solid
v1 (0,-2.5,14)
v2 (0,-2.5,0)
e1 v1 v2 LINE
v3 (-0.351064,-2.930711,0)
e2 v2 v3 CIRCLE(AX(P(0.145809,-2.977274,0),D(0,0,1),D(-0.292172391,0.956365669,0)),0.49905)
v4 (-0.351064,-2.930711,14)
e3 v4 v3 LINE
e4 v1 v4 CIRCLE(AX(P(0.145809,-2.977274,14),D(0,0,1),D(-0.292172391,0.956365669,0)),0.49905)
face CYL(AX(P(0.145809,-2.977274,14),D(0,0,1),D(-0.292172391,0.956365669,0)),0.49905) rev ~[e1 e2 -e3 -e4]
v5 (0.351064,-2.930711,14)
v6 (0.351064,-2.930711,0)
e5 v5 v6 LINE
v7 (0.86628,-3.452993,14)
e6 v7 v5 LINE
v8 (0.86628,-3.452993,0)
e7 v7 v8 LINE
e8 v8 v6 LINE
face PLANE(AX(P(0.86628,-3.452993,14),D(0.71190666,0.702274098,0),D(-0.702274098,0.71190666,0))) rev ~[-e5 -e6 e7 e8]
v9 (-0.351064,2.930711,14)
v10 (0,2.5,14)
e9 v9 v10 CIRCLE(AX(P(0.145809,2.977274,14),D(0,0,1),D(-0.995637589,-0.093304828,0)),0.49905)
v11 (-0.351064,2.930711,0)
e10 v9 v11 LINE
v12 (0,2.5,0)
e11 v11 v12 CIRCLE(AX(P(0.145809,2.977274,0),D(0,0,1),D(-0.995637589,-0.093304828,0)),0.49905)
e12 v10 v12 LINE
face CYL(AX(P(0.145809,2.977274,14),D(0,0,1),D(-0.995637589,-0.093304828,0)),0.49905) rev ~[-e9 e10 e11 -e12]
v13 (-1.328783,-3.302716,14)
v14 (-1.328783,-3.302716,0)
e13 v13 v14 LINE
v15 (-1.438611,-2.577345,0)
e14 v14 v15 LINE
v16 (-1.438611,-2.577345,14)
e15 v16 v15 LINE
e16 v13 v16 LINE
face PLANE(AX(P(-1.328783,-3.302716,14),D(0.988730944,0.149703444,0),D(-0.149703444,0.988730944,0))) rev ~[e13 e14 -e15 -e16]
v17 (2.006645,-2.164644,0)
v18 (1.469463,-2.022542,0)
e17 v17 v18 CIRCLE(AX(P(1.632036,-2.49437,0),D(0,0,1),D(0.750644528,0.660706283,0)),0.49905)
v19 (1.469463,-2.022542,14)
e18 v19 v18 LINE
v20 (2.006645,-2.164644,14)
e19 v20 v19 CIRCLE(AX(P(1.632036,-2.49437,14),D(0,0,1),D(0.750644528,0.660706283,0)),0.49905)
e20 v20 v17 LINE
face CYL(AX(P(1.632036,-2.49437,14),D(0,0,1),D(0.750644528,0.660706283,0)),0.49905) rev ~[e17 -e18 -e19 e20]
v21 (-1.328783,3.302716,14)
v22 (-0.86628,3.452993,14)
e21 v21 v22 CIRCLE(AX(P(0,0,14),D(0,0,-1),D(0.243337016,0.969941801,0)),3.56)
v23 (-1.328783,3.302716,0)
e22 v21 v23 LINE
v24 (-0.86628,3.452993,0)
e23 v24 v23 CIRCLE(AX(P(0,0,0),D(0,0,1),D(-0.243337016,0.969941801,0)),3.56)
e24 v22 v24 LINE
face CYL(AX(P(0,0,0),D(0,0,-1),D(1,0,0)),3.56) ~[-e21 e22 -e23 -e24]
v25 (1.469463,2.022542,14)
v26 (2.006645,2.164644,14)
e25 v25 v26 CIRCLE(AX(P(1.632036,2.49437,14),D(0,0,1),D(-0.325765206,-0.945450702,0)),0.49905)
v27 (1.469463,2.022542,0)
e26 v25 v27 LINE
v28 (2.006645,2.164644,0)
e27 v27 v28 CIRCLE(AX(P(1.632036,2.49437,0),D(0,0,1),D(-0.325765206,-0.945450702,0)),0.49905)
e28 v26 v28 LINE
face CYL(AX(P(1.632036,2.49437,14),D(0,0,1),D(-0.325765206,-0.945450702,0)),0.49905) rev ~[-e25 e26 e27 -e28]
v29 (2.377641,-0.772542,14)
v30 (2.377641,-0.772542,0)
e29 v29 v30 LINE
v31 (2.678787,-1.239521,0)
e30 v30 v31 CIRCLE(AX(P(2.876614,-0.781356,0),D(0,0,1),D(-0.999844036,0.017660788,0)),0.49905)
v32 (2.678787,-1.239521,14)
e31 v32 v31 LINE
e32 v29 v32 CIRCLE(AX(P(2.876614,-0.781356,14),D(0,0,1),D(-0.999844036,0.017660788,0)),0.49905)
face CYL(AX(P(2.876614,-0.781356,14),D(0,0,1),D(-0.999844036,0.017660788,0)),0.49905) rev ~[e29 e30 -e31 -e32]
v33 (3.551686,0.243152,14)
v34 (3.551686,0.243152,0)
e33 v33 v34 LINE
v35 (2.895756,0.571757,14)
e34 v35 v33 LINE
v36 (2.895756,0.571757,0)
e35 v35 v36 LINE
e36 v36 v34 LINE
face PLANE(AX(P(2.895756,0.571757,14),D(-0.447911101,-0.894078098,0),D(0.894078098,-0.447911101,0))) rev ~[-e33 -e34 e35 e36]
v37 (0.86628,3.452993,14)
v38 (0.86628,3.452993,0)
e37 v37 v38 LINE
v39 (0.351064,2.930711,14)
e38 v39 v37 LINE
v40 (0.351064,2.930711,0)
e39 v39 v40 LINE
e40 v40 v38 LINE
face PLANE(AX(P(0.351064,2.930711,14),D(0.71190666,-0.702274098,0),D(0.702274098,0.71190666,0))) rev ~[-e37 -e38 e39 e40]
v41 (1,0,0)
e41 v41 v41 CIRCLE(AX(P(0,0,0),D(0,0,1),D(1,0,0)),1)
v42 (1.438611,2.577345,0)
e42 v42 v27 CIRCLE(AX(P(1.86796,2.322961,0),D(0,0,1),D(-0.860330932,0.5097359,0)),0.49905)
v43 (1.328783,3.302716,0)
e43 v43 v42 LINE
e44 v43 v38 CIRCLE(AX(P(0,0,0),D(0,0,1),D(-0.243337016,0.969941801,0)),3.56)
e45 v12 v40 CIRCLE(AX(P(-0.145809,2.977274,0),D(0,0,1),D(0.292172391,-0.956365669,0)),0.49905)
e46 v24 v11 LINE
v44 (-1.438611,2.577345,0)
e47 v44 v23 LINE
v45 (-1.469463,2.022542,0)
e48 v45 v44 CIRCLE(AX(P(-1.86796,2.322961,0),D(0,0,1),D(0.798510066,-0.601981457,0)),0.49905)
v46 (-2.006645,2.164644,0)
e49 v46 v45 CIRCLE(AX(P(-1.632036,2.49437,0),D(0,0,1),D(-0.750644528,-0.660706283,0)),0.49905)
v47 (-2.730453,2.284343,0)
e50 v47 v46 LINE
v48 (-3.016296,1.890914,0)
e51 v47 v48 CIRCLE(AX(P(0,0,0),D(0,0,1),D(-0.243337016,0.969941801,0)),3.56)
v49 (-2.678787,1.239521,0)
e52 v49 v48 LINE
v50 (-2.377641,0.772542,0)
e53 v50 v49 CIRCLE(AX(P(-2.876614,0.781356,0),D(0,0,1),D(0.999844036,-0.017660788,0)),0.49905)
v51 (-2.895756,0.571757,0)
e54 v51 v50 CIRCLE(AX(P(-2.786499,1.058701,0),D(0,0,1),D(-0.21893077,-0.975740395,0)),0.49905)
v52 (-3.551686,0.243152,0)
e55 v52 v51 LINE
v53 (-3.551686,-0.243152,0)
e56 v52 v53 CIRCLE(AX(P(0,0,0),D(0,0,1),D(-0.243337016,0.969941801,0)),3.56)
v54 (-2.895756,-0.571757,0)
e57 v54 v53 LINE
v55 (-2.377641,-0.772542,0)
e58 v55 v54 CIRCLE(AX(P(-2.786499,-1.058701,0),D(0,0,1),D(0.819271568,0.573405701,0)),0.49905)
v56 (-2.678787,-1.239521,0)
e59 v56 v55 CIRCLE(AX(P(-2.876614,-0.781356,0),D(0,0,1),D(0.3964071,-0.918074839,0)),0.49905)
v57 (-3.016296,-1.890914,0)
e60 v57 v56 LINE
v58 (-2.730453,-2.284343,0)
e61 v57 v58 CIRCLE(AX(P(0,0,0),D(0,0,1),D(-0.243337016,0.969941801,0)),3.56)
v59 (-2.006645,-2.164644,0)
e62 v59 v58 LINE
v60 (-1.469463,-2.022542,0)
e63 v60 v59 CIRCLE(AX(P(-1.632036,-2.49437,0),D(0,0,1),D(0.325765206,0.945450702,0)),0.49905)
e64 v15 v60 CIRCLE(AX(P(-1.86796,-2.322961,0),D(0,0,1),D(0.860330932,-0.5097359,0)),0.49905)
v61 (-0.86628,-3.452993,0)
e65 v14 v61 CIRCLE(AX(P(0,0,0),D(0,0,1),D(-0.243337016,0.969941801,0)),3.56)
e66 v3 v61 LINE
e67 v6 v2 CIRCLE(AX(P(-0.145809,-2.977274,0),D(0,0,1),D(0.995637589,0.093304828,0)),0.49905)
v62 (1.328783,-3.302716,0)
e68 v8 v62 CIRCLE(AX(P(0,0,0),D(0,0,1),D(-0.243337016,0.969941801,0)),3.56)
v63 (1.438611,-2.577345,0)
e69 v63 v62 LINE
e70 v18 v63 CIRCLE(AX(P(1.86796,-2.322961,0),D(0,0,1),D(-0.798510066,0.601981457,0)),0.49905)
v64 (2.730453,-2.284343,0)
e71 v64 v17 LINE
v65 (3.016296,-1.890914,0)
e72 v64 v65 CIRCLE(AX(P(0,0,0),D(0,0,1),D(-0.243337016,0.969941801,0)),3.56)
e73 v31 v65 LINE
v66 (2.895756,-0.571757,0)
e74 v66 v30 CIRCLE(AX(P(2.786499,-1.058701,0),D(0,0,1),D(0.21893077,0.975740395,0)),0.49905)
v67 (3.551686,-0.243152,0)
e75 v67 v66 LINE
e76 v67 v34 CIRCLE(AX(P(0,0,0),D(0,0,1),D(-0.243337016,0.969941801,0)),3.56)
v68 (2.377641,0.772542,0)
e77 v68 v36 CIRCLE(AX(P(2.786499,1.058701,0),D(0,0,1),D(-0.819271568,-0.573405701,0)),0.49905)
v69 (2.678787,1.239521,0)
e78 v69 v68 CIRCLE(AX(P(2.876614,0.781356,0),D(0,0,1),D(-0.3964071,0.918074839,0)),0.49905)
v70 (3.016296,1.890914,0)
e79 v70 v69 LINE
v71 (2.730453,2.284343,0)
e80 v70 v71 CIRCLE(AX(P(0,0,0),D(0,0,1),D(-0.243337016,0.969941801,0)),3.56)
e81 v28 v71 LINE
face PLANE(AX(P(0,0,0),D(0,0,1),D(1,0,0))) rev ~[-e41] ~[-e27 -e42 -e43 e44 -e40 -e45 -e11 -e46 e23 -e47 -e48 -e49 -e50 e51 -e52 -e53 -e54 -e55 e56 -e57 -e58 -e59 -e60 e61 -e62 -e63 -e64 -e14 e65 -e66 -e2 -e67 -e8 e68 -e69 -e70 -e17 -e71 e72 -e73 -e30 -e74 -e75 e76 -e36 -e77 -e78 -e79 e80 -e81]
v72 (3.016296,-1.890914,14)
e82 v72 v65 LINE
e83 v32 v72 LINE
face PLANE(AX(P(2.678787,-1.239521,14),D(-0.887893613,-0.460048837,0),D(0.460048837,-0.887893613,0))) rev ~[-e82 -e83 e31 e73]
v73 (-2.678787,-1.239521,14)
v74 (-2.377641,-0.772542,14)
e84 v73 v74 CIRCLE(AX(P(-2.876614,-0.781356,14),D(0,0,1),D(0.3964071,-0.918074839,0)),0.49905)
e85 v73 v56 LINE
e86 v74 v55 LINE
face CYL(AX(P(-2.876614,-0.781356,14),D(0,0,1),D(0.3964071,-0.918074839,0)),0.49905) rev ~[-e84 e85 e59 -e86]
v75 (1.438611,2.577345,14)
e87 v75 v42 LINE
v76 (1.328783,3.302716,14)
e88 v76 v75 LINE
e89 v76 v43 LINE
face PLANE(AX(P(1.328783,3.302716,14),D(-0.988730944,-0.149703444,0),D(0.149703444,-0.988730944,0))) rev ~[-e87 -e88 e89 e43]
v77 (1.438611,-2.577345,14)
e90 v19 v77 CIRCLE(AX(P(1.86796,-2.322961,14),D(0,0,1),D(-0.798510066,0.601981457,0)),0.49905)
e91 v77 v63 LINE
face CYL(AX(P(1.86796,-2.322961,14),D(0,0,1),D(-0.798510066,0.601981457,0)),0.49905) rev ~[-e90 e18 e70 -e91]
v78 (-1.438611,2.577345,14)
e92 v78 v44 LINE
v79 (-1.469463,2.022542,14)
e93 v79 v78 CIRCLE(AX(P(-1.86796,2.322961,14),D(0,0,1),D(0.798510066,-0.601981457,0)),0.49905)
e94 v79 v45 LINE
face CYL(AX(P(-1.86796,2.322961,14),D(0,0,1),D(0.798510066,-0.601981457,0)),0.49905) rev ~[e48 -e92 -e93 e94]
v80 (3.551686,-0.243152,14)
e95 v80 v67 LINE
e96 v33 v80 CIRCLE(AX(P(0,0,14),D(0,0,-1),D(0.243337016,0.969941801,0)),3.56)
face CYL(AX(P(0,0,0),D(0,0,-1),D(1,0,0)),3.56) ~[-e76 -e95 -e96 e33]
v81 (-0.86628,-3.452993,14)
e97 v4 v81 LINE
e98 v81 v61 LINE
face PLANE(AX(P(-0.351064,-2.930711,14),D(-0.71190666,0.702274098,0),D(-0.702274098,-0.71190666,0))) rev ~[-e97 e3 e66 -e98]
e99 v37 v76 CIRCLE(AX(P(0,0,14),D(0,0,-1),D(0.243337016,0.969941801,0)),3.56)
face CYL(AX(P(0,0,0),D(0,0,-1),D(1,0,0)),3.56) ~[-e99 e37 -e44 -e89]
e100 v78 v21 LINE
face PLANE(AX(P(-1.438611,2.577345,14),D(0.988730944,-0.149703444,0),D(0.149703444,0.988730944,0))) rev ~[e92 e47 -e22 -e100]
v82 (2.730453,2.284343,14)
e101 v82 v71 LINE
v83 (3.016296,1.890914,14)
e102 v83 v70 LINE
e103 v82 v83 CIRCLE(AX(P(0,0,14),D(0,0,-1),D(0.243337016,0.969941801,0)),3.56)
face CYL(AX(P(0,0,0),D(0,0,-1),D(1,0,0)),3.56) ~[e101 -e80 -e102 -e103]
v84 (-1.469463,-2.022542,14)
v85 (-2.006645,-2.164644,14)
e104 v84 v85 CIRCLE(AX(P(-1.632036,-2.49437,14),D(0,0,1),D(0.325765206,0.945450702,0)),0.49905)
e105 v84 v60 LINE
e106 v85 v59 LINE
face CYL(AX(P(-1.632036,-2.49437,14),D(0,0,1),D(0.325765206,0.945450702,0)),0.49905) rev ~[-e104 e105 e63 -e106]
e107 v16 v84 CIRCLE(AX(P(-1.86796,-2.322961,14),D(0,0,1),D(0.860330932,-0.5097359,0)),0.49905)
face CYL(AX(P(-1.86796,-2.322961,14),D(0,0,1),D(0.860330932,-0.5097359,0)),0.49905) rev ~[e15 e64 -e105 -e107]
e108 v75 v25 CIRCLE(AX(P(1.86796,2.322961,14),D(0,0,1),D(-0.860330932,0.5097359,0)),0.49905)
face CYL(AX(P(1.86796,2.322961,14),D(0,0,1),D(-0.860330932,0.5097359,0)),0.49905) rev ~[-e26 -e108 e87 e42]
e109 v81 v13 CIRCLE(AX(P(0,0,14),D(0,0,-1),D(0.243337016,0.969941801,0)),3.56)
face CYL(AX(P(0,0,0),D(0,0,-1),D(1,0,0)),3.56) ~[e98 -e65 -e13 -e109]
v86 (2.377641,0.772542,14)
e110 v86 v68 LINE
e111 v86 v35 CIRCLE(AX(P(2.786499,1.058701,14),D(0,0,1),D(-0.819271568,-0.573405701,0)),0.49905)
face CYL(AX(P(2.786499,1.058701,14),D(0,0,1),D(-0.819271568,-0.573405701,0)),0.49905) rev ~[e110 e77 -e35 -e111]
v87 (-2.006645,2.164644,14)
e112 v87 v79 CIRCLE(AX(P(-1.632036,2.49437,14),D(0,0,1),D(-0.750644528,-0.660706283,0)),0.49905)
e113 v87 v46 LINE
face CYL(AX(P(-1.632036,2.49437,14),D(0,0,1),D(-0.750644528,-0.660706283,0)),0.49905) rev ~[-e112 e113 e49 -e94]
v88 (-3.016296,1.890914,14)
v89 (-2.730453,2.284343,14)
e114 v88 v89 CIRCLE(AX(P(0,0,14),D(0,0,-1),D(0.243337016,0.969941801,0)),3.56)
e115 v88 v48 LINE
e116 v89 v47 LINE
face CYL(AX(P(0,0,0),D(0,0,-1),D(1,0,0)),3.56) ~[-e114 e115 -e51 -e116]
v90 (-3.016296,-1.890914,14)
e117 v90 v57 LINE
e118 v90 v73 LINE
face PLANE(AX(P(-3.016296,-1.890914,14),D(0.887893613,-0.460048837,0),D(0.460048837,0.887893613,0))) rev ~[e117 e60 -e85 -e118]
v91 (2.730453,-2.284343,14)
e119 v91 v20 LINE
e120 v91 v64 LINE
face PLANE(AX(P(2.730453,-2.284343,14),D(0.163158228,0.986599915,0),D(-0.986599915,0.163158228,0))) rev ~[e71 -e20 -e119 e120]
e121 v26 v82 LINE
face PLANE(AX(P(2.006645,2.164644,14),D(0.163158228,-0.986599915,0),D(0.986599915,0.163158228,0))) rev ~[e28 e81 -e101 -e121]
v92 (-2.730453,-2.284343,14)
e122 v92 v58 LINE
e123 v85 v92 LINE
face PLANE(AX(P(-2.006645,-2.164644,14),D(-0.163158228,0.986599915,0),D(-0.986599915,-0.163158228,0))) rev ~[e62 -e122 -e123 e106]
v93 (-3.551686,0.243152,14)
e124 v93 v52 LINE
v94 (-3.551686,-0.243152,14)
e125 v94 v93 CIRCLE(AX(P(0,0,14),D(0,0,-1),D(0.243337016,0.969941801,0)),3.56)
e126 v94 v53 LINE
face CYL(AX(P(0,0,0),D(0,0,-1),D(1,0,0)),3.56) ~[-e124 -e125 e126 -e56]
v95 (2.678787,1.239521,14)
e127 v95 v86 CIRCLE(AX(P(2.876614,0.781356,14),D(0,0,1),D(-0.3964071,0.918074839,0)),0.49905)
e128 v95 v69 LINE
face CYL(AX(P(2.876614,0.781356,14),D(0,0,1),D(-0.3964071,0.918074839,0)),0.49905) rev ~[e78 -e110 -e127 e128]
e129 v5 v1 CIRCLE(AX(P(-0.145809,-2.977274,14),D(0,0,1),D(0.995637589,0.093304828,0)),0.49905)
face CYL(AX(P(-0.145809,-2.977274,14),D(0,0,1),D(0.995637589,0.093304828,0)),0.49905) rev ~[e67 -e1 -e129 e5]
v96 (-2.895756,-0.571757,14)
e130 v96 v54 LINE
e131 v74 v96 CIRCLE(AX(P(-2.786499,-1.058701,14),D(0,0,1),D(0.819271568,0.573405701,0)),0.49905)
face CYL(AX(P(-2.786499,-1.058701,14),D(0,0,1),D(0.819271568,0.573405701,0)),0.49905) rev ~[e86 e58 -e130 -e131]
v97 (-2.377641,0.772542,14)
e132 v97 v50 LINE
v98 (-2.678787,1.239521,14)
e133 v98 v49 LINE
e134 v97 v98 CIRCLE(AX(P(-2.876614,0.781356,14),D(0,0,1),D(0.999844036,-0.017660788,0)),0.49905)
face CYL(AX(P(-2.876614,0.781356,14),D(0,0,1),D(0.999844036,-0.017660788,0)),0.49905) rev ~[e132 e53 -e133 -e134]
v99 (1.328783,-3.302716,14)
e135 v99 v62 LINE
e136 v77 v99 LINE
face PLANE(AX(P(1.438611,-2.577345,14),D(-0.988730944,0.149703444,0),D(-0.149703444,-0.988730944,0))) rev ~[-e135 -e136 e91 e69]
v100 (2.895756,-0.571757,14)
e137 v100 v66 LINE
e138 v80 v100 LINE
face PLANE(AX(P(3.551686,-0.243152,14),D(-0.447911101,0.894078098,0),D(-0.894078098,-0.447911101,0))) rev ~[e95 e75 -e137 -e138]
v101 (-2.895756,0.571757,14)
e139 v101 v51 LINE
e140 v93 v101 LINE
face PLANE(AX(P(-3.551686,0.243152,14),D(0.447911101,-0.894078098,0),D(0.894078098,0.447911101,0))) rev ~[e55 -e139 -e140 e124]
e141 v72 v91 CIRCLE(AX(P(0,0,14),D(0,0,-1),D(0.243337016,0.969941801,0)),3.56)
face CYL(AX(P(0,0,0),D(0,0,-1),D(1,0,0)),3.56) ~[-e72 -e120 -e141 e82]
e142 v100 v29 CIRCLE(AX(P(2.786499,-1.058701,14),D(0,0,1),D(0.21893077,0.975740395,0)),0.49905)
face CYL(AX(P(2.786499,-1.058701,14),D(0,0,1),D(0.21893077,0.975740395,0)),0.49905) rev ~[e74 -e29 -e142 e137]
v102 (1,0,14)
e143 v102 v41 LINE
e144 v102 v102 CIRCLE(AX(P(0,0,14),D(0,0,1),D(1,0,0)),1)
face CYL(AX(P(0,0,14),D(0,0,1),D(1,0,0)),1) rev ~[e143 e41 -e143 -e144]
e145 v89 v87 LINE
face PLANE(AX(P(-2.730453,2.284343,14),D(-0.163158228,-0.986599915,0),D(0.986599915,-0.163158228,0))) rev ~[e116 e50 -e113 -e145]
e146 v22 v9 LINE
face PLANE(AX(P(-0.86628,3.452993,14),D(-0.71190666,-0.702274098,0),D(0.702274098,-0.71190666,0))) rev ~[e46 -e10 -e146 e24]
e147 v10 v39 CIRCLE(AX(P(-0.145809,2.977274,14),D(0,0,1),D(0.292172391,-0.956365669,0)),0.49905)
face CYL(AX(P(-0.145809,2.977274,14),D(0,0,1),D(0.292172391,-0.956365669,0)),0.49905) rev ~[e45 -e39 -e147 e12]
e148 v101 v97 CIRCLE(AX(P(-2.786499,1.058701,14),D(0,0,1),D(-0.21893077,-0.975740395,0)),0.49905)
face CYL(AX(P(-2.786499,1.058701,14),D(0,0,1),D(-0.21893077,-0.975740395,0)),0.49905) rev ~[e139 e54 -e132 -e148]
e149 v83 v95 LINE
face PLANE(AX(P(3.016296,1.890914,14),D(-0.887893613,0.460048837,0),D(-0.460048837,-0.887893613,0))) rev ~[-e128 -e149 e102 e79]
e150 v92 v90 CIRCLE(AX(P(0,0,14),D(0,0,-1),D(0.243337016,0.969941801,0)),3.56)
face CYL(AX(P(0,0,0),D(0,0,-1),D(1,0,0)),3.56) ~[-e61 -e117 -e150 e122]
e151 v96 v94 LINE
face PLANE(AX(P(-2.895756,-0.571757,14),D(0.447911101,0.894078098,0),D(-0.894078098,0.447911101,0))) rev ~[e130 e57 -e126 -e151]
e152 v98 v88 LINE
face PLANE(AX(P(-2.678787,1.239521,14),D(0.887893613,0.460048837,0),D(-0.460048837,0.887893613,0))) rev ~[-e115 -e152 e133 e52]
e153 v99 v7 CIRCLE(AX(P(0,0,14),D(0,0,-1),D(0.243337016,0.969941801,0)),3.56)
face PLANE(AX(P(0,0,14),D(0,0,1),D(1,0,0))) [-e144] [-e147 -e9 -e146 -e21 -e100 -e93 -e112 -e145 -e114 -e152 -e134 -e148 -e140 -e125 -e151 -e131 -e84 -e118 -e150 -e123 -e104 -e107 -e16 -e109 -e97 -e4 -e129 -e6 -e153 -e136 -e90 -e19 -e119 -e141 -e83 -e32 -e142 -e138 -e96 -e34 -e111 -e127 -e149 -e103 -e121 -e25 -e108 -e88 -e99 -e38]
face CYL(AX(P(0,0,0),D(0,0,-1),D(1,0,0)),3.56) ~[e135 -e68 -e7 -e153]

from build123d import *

# Parameters (mm, degrees)
F0_R     = 3.56
F1_DEPTH = 14
F2_R     = 1
F3_DEPTH = 20.5
F5_DEPTH = 14
F6_COUNT = 10


with BuildPart() as f1:
    # F0 (on Top) → F1 (new body)
    with BuildSketch(Plane.XY):
        Circle(F0_R)
    extrude(amount=F1_DEPTH)

    # F2 (on face) → F3 (cut)
    with BuildSketch(Plane.XY.offset(14)):
        Circle(F2_R)
    extrude(amount=-F3_DEPTH, mode=Mode.SUBTRACT)

    # F4 (on face) → F5 (cut)
    with BuildSketch(Plane.XY.offset(14)):
        with BuildLine():
            ThreePointArc((-0.3510643437, 2.9307105578), (-0.2410218301, 2.6619758494), (0, 2.5))
            ThreePointArc((0, 2.5), (0.2410218301, 2.6619758494), (0.3510643437, 2.9307105578))
            Line((0.3510643437, 2.9307105578), (0.8662797764, 3.4529928104))
            ThreePointArc((0.8662797764, 3.4529928104), (0, 3.56), (-0.8662797764, 3.4529928104))
            Line((-0.8662797764, 3.4529928104), (-0.3510643437, 2.9307105578))
        make_face()
    f5 = extrude(amount=-F5_DEPTH, mode=Mode.SUBTRACT)

    # F6: F5 ×10 about axis
    f6_axis = Axis((0, 0, 0), (0, 0, -1))
    for i in range(1, F6_COUNT):
        add(f5.rotate(f6_axis, i * 360 / F6_COUNT), mode=Mode.SUBTRACT)


solid = f1.part
